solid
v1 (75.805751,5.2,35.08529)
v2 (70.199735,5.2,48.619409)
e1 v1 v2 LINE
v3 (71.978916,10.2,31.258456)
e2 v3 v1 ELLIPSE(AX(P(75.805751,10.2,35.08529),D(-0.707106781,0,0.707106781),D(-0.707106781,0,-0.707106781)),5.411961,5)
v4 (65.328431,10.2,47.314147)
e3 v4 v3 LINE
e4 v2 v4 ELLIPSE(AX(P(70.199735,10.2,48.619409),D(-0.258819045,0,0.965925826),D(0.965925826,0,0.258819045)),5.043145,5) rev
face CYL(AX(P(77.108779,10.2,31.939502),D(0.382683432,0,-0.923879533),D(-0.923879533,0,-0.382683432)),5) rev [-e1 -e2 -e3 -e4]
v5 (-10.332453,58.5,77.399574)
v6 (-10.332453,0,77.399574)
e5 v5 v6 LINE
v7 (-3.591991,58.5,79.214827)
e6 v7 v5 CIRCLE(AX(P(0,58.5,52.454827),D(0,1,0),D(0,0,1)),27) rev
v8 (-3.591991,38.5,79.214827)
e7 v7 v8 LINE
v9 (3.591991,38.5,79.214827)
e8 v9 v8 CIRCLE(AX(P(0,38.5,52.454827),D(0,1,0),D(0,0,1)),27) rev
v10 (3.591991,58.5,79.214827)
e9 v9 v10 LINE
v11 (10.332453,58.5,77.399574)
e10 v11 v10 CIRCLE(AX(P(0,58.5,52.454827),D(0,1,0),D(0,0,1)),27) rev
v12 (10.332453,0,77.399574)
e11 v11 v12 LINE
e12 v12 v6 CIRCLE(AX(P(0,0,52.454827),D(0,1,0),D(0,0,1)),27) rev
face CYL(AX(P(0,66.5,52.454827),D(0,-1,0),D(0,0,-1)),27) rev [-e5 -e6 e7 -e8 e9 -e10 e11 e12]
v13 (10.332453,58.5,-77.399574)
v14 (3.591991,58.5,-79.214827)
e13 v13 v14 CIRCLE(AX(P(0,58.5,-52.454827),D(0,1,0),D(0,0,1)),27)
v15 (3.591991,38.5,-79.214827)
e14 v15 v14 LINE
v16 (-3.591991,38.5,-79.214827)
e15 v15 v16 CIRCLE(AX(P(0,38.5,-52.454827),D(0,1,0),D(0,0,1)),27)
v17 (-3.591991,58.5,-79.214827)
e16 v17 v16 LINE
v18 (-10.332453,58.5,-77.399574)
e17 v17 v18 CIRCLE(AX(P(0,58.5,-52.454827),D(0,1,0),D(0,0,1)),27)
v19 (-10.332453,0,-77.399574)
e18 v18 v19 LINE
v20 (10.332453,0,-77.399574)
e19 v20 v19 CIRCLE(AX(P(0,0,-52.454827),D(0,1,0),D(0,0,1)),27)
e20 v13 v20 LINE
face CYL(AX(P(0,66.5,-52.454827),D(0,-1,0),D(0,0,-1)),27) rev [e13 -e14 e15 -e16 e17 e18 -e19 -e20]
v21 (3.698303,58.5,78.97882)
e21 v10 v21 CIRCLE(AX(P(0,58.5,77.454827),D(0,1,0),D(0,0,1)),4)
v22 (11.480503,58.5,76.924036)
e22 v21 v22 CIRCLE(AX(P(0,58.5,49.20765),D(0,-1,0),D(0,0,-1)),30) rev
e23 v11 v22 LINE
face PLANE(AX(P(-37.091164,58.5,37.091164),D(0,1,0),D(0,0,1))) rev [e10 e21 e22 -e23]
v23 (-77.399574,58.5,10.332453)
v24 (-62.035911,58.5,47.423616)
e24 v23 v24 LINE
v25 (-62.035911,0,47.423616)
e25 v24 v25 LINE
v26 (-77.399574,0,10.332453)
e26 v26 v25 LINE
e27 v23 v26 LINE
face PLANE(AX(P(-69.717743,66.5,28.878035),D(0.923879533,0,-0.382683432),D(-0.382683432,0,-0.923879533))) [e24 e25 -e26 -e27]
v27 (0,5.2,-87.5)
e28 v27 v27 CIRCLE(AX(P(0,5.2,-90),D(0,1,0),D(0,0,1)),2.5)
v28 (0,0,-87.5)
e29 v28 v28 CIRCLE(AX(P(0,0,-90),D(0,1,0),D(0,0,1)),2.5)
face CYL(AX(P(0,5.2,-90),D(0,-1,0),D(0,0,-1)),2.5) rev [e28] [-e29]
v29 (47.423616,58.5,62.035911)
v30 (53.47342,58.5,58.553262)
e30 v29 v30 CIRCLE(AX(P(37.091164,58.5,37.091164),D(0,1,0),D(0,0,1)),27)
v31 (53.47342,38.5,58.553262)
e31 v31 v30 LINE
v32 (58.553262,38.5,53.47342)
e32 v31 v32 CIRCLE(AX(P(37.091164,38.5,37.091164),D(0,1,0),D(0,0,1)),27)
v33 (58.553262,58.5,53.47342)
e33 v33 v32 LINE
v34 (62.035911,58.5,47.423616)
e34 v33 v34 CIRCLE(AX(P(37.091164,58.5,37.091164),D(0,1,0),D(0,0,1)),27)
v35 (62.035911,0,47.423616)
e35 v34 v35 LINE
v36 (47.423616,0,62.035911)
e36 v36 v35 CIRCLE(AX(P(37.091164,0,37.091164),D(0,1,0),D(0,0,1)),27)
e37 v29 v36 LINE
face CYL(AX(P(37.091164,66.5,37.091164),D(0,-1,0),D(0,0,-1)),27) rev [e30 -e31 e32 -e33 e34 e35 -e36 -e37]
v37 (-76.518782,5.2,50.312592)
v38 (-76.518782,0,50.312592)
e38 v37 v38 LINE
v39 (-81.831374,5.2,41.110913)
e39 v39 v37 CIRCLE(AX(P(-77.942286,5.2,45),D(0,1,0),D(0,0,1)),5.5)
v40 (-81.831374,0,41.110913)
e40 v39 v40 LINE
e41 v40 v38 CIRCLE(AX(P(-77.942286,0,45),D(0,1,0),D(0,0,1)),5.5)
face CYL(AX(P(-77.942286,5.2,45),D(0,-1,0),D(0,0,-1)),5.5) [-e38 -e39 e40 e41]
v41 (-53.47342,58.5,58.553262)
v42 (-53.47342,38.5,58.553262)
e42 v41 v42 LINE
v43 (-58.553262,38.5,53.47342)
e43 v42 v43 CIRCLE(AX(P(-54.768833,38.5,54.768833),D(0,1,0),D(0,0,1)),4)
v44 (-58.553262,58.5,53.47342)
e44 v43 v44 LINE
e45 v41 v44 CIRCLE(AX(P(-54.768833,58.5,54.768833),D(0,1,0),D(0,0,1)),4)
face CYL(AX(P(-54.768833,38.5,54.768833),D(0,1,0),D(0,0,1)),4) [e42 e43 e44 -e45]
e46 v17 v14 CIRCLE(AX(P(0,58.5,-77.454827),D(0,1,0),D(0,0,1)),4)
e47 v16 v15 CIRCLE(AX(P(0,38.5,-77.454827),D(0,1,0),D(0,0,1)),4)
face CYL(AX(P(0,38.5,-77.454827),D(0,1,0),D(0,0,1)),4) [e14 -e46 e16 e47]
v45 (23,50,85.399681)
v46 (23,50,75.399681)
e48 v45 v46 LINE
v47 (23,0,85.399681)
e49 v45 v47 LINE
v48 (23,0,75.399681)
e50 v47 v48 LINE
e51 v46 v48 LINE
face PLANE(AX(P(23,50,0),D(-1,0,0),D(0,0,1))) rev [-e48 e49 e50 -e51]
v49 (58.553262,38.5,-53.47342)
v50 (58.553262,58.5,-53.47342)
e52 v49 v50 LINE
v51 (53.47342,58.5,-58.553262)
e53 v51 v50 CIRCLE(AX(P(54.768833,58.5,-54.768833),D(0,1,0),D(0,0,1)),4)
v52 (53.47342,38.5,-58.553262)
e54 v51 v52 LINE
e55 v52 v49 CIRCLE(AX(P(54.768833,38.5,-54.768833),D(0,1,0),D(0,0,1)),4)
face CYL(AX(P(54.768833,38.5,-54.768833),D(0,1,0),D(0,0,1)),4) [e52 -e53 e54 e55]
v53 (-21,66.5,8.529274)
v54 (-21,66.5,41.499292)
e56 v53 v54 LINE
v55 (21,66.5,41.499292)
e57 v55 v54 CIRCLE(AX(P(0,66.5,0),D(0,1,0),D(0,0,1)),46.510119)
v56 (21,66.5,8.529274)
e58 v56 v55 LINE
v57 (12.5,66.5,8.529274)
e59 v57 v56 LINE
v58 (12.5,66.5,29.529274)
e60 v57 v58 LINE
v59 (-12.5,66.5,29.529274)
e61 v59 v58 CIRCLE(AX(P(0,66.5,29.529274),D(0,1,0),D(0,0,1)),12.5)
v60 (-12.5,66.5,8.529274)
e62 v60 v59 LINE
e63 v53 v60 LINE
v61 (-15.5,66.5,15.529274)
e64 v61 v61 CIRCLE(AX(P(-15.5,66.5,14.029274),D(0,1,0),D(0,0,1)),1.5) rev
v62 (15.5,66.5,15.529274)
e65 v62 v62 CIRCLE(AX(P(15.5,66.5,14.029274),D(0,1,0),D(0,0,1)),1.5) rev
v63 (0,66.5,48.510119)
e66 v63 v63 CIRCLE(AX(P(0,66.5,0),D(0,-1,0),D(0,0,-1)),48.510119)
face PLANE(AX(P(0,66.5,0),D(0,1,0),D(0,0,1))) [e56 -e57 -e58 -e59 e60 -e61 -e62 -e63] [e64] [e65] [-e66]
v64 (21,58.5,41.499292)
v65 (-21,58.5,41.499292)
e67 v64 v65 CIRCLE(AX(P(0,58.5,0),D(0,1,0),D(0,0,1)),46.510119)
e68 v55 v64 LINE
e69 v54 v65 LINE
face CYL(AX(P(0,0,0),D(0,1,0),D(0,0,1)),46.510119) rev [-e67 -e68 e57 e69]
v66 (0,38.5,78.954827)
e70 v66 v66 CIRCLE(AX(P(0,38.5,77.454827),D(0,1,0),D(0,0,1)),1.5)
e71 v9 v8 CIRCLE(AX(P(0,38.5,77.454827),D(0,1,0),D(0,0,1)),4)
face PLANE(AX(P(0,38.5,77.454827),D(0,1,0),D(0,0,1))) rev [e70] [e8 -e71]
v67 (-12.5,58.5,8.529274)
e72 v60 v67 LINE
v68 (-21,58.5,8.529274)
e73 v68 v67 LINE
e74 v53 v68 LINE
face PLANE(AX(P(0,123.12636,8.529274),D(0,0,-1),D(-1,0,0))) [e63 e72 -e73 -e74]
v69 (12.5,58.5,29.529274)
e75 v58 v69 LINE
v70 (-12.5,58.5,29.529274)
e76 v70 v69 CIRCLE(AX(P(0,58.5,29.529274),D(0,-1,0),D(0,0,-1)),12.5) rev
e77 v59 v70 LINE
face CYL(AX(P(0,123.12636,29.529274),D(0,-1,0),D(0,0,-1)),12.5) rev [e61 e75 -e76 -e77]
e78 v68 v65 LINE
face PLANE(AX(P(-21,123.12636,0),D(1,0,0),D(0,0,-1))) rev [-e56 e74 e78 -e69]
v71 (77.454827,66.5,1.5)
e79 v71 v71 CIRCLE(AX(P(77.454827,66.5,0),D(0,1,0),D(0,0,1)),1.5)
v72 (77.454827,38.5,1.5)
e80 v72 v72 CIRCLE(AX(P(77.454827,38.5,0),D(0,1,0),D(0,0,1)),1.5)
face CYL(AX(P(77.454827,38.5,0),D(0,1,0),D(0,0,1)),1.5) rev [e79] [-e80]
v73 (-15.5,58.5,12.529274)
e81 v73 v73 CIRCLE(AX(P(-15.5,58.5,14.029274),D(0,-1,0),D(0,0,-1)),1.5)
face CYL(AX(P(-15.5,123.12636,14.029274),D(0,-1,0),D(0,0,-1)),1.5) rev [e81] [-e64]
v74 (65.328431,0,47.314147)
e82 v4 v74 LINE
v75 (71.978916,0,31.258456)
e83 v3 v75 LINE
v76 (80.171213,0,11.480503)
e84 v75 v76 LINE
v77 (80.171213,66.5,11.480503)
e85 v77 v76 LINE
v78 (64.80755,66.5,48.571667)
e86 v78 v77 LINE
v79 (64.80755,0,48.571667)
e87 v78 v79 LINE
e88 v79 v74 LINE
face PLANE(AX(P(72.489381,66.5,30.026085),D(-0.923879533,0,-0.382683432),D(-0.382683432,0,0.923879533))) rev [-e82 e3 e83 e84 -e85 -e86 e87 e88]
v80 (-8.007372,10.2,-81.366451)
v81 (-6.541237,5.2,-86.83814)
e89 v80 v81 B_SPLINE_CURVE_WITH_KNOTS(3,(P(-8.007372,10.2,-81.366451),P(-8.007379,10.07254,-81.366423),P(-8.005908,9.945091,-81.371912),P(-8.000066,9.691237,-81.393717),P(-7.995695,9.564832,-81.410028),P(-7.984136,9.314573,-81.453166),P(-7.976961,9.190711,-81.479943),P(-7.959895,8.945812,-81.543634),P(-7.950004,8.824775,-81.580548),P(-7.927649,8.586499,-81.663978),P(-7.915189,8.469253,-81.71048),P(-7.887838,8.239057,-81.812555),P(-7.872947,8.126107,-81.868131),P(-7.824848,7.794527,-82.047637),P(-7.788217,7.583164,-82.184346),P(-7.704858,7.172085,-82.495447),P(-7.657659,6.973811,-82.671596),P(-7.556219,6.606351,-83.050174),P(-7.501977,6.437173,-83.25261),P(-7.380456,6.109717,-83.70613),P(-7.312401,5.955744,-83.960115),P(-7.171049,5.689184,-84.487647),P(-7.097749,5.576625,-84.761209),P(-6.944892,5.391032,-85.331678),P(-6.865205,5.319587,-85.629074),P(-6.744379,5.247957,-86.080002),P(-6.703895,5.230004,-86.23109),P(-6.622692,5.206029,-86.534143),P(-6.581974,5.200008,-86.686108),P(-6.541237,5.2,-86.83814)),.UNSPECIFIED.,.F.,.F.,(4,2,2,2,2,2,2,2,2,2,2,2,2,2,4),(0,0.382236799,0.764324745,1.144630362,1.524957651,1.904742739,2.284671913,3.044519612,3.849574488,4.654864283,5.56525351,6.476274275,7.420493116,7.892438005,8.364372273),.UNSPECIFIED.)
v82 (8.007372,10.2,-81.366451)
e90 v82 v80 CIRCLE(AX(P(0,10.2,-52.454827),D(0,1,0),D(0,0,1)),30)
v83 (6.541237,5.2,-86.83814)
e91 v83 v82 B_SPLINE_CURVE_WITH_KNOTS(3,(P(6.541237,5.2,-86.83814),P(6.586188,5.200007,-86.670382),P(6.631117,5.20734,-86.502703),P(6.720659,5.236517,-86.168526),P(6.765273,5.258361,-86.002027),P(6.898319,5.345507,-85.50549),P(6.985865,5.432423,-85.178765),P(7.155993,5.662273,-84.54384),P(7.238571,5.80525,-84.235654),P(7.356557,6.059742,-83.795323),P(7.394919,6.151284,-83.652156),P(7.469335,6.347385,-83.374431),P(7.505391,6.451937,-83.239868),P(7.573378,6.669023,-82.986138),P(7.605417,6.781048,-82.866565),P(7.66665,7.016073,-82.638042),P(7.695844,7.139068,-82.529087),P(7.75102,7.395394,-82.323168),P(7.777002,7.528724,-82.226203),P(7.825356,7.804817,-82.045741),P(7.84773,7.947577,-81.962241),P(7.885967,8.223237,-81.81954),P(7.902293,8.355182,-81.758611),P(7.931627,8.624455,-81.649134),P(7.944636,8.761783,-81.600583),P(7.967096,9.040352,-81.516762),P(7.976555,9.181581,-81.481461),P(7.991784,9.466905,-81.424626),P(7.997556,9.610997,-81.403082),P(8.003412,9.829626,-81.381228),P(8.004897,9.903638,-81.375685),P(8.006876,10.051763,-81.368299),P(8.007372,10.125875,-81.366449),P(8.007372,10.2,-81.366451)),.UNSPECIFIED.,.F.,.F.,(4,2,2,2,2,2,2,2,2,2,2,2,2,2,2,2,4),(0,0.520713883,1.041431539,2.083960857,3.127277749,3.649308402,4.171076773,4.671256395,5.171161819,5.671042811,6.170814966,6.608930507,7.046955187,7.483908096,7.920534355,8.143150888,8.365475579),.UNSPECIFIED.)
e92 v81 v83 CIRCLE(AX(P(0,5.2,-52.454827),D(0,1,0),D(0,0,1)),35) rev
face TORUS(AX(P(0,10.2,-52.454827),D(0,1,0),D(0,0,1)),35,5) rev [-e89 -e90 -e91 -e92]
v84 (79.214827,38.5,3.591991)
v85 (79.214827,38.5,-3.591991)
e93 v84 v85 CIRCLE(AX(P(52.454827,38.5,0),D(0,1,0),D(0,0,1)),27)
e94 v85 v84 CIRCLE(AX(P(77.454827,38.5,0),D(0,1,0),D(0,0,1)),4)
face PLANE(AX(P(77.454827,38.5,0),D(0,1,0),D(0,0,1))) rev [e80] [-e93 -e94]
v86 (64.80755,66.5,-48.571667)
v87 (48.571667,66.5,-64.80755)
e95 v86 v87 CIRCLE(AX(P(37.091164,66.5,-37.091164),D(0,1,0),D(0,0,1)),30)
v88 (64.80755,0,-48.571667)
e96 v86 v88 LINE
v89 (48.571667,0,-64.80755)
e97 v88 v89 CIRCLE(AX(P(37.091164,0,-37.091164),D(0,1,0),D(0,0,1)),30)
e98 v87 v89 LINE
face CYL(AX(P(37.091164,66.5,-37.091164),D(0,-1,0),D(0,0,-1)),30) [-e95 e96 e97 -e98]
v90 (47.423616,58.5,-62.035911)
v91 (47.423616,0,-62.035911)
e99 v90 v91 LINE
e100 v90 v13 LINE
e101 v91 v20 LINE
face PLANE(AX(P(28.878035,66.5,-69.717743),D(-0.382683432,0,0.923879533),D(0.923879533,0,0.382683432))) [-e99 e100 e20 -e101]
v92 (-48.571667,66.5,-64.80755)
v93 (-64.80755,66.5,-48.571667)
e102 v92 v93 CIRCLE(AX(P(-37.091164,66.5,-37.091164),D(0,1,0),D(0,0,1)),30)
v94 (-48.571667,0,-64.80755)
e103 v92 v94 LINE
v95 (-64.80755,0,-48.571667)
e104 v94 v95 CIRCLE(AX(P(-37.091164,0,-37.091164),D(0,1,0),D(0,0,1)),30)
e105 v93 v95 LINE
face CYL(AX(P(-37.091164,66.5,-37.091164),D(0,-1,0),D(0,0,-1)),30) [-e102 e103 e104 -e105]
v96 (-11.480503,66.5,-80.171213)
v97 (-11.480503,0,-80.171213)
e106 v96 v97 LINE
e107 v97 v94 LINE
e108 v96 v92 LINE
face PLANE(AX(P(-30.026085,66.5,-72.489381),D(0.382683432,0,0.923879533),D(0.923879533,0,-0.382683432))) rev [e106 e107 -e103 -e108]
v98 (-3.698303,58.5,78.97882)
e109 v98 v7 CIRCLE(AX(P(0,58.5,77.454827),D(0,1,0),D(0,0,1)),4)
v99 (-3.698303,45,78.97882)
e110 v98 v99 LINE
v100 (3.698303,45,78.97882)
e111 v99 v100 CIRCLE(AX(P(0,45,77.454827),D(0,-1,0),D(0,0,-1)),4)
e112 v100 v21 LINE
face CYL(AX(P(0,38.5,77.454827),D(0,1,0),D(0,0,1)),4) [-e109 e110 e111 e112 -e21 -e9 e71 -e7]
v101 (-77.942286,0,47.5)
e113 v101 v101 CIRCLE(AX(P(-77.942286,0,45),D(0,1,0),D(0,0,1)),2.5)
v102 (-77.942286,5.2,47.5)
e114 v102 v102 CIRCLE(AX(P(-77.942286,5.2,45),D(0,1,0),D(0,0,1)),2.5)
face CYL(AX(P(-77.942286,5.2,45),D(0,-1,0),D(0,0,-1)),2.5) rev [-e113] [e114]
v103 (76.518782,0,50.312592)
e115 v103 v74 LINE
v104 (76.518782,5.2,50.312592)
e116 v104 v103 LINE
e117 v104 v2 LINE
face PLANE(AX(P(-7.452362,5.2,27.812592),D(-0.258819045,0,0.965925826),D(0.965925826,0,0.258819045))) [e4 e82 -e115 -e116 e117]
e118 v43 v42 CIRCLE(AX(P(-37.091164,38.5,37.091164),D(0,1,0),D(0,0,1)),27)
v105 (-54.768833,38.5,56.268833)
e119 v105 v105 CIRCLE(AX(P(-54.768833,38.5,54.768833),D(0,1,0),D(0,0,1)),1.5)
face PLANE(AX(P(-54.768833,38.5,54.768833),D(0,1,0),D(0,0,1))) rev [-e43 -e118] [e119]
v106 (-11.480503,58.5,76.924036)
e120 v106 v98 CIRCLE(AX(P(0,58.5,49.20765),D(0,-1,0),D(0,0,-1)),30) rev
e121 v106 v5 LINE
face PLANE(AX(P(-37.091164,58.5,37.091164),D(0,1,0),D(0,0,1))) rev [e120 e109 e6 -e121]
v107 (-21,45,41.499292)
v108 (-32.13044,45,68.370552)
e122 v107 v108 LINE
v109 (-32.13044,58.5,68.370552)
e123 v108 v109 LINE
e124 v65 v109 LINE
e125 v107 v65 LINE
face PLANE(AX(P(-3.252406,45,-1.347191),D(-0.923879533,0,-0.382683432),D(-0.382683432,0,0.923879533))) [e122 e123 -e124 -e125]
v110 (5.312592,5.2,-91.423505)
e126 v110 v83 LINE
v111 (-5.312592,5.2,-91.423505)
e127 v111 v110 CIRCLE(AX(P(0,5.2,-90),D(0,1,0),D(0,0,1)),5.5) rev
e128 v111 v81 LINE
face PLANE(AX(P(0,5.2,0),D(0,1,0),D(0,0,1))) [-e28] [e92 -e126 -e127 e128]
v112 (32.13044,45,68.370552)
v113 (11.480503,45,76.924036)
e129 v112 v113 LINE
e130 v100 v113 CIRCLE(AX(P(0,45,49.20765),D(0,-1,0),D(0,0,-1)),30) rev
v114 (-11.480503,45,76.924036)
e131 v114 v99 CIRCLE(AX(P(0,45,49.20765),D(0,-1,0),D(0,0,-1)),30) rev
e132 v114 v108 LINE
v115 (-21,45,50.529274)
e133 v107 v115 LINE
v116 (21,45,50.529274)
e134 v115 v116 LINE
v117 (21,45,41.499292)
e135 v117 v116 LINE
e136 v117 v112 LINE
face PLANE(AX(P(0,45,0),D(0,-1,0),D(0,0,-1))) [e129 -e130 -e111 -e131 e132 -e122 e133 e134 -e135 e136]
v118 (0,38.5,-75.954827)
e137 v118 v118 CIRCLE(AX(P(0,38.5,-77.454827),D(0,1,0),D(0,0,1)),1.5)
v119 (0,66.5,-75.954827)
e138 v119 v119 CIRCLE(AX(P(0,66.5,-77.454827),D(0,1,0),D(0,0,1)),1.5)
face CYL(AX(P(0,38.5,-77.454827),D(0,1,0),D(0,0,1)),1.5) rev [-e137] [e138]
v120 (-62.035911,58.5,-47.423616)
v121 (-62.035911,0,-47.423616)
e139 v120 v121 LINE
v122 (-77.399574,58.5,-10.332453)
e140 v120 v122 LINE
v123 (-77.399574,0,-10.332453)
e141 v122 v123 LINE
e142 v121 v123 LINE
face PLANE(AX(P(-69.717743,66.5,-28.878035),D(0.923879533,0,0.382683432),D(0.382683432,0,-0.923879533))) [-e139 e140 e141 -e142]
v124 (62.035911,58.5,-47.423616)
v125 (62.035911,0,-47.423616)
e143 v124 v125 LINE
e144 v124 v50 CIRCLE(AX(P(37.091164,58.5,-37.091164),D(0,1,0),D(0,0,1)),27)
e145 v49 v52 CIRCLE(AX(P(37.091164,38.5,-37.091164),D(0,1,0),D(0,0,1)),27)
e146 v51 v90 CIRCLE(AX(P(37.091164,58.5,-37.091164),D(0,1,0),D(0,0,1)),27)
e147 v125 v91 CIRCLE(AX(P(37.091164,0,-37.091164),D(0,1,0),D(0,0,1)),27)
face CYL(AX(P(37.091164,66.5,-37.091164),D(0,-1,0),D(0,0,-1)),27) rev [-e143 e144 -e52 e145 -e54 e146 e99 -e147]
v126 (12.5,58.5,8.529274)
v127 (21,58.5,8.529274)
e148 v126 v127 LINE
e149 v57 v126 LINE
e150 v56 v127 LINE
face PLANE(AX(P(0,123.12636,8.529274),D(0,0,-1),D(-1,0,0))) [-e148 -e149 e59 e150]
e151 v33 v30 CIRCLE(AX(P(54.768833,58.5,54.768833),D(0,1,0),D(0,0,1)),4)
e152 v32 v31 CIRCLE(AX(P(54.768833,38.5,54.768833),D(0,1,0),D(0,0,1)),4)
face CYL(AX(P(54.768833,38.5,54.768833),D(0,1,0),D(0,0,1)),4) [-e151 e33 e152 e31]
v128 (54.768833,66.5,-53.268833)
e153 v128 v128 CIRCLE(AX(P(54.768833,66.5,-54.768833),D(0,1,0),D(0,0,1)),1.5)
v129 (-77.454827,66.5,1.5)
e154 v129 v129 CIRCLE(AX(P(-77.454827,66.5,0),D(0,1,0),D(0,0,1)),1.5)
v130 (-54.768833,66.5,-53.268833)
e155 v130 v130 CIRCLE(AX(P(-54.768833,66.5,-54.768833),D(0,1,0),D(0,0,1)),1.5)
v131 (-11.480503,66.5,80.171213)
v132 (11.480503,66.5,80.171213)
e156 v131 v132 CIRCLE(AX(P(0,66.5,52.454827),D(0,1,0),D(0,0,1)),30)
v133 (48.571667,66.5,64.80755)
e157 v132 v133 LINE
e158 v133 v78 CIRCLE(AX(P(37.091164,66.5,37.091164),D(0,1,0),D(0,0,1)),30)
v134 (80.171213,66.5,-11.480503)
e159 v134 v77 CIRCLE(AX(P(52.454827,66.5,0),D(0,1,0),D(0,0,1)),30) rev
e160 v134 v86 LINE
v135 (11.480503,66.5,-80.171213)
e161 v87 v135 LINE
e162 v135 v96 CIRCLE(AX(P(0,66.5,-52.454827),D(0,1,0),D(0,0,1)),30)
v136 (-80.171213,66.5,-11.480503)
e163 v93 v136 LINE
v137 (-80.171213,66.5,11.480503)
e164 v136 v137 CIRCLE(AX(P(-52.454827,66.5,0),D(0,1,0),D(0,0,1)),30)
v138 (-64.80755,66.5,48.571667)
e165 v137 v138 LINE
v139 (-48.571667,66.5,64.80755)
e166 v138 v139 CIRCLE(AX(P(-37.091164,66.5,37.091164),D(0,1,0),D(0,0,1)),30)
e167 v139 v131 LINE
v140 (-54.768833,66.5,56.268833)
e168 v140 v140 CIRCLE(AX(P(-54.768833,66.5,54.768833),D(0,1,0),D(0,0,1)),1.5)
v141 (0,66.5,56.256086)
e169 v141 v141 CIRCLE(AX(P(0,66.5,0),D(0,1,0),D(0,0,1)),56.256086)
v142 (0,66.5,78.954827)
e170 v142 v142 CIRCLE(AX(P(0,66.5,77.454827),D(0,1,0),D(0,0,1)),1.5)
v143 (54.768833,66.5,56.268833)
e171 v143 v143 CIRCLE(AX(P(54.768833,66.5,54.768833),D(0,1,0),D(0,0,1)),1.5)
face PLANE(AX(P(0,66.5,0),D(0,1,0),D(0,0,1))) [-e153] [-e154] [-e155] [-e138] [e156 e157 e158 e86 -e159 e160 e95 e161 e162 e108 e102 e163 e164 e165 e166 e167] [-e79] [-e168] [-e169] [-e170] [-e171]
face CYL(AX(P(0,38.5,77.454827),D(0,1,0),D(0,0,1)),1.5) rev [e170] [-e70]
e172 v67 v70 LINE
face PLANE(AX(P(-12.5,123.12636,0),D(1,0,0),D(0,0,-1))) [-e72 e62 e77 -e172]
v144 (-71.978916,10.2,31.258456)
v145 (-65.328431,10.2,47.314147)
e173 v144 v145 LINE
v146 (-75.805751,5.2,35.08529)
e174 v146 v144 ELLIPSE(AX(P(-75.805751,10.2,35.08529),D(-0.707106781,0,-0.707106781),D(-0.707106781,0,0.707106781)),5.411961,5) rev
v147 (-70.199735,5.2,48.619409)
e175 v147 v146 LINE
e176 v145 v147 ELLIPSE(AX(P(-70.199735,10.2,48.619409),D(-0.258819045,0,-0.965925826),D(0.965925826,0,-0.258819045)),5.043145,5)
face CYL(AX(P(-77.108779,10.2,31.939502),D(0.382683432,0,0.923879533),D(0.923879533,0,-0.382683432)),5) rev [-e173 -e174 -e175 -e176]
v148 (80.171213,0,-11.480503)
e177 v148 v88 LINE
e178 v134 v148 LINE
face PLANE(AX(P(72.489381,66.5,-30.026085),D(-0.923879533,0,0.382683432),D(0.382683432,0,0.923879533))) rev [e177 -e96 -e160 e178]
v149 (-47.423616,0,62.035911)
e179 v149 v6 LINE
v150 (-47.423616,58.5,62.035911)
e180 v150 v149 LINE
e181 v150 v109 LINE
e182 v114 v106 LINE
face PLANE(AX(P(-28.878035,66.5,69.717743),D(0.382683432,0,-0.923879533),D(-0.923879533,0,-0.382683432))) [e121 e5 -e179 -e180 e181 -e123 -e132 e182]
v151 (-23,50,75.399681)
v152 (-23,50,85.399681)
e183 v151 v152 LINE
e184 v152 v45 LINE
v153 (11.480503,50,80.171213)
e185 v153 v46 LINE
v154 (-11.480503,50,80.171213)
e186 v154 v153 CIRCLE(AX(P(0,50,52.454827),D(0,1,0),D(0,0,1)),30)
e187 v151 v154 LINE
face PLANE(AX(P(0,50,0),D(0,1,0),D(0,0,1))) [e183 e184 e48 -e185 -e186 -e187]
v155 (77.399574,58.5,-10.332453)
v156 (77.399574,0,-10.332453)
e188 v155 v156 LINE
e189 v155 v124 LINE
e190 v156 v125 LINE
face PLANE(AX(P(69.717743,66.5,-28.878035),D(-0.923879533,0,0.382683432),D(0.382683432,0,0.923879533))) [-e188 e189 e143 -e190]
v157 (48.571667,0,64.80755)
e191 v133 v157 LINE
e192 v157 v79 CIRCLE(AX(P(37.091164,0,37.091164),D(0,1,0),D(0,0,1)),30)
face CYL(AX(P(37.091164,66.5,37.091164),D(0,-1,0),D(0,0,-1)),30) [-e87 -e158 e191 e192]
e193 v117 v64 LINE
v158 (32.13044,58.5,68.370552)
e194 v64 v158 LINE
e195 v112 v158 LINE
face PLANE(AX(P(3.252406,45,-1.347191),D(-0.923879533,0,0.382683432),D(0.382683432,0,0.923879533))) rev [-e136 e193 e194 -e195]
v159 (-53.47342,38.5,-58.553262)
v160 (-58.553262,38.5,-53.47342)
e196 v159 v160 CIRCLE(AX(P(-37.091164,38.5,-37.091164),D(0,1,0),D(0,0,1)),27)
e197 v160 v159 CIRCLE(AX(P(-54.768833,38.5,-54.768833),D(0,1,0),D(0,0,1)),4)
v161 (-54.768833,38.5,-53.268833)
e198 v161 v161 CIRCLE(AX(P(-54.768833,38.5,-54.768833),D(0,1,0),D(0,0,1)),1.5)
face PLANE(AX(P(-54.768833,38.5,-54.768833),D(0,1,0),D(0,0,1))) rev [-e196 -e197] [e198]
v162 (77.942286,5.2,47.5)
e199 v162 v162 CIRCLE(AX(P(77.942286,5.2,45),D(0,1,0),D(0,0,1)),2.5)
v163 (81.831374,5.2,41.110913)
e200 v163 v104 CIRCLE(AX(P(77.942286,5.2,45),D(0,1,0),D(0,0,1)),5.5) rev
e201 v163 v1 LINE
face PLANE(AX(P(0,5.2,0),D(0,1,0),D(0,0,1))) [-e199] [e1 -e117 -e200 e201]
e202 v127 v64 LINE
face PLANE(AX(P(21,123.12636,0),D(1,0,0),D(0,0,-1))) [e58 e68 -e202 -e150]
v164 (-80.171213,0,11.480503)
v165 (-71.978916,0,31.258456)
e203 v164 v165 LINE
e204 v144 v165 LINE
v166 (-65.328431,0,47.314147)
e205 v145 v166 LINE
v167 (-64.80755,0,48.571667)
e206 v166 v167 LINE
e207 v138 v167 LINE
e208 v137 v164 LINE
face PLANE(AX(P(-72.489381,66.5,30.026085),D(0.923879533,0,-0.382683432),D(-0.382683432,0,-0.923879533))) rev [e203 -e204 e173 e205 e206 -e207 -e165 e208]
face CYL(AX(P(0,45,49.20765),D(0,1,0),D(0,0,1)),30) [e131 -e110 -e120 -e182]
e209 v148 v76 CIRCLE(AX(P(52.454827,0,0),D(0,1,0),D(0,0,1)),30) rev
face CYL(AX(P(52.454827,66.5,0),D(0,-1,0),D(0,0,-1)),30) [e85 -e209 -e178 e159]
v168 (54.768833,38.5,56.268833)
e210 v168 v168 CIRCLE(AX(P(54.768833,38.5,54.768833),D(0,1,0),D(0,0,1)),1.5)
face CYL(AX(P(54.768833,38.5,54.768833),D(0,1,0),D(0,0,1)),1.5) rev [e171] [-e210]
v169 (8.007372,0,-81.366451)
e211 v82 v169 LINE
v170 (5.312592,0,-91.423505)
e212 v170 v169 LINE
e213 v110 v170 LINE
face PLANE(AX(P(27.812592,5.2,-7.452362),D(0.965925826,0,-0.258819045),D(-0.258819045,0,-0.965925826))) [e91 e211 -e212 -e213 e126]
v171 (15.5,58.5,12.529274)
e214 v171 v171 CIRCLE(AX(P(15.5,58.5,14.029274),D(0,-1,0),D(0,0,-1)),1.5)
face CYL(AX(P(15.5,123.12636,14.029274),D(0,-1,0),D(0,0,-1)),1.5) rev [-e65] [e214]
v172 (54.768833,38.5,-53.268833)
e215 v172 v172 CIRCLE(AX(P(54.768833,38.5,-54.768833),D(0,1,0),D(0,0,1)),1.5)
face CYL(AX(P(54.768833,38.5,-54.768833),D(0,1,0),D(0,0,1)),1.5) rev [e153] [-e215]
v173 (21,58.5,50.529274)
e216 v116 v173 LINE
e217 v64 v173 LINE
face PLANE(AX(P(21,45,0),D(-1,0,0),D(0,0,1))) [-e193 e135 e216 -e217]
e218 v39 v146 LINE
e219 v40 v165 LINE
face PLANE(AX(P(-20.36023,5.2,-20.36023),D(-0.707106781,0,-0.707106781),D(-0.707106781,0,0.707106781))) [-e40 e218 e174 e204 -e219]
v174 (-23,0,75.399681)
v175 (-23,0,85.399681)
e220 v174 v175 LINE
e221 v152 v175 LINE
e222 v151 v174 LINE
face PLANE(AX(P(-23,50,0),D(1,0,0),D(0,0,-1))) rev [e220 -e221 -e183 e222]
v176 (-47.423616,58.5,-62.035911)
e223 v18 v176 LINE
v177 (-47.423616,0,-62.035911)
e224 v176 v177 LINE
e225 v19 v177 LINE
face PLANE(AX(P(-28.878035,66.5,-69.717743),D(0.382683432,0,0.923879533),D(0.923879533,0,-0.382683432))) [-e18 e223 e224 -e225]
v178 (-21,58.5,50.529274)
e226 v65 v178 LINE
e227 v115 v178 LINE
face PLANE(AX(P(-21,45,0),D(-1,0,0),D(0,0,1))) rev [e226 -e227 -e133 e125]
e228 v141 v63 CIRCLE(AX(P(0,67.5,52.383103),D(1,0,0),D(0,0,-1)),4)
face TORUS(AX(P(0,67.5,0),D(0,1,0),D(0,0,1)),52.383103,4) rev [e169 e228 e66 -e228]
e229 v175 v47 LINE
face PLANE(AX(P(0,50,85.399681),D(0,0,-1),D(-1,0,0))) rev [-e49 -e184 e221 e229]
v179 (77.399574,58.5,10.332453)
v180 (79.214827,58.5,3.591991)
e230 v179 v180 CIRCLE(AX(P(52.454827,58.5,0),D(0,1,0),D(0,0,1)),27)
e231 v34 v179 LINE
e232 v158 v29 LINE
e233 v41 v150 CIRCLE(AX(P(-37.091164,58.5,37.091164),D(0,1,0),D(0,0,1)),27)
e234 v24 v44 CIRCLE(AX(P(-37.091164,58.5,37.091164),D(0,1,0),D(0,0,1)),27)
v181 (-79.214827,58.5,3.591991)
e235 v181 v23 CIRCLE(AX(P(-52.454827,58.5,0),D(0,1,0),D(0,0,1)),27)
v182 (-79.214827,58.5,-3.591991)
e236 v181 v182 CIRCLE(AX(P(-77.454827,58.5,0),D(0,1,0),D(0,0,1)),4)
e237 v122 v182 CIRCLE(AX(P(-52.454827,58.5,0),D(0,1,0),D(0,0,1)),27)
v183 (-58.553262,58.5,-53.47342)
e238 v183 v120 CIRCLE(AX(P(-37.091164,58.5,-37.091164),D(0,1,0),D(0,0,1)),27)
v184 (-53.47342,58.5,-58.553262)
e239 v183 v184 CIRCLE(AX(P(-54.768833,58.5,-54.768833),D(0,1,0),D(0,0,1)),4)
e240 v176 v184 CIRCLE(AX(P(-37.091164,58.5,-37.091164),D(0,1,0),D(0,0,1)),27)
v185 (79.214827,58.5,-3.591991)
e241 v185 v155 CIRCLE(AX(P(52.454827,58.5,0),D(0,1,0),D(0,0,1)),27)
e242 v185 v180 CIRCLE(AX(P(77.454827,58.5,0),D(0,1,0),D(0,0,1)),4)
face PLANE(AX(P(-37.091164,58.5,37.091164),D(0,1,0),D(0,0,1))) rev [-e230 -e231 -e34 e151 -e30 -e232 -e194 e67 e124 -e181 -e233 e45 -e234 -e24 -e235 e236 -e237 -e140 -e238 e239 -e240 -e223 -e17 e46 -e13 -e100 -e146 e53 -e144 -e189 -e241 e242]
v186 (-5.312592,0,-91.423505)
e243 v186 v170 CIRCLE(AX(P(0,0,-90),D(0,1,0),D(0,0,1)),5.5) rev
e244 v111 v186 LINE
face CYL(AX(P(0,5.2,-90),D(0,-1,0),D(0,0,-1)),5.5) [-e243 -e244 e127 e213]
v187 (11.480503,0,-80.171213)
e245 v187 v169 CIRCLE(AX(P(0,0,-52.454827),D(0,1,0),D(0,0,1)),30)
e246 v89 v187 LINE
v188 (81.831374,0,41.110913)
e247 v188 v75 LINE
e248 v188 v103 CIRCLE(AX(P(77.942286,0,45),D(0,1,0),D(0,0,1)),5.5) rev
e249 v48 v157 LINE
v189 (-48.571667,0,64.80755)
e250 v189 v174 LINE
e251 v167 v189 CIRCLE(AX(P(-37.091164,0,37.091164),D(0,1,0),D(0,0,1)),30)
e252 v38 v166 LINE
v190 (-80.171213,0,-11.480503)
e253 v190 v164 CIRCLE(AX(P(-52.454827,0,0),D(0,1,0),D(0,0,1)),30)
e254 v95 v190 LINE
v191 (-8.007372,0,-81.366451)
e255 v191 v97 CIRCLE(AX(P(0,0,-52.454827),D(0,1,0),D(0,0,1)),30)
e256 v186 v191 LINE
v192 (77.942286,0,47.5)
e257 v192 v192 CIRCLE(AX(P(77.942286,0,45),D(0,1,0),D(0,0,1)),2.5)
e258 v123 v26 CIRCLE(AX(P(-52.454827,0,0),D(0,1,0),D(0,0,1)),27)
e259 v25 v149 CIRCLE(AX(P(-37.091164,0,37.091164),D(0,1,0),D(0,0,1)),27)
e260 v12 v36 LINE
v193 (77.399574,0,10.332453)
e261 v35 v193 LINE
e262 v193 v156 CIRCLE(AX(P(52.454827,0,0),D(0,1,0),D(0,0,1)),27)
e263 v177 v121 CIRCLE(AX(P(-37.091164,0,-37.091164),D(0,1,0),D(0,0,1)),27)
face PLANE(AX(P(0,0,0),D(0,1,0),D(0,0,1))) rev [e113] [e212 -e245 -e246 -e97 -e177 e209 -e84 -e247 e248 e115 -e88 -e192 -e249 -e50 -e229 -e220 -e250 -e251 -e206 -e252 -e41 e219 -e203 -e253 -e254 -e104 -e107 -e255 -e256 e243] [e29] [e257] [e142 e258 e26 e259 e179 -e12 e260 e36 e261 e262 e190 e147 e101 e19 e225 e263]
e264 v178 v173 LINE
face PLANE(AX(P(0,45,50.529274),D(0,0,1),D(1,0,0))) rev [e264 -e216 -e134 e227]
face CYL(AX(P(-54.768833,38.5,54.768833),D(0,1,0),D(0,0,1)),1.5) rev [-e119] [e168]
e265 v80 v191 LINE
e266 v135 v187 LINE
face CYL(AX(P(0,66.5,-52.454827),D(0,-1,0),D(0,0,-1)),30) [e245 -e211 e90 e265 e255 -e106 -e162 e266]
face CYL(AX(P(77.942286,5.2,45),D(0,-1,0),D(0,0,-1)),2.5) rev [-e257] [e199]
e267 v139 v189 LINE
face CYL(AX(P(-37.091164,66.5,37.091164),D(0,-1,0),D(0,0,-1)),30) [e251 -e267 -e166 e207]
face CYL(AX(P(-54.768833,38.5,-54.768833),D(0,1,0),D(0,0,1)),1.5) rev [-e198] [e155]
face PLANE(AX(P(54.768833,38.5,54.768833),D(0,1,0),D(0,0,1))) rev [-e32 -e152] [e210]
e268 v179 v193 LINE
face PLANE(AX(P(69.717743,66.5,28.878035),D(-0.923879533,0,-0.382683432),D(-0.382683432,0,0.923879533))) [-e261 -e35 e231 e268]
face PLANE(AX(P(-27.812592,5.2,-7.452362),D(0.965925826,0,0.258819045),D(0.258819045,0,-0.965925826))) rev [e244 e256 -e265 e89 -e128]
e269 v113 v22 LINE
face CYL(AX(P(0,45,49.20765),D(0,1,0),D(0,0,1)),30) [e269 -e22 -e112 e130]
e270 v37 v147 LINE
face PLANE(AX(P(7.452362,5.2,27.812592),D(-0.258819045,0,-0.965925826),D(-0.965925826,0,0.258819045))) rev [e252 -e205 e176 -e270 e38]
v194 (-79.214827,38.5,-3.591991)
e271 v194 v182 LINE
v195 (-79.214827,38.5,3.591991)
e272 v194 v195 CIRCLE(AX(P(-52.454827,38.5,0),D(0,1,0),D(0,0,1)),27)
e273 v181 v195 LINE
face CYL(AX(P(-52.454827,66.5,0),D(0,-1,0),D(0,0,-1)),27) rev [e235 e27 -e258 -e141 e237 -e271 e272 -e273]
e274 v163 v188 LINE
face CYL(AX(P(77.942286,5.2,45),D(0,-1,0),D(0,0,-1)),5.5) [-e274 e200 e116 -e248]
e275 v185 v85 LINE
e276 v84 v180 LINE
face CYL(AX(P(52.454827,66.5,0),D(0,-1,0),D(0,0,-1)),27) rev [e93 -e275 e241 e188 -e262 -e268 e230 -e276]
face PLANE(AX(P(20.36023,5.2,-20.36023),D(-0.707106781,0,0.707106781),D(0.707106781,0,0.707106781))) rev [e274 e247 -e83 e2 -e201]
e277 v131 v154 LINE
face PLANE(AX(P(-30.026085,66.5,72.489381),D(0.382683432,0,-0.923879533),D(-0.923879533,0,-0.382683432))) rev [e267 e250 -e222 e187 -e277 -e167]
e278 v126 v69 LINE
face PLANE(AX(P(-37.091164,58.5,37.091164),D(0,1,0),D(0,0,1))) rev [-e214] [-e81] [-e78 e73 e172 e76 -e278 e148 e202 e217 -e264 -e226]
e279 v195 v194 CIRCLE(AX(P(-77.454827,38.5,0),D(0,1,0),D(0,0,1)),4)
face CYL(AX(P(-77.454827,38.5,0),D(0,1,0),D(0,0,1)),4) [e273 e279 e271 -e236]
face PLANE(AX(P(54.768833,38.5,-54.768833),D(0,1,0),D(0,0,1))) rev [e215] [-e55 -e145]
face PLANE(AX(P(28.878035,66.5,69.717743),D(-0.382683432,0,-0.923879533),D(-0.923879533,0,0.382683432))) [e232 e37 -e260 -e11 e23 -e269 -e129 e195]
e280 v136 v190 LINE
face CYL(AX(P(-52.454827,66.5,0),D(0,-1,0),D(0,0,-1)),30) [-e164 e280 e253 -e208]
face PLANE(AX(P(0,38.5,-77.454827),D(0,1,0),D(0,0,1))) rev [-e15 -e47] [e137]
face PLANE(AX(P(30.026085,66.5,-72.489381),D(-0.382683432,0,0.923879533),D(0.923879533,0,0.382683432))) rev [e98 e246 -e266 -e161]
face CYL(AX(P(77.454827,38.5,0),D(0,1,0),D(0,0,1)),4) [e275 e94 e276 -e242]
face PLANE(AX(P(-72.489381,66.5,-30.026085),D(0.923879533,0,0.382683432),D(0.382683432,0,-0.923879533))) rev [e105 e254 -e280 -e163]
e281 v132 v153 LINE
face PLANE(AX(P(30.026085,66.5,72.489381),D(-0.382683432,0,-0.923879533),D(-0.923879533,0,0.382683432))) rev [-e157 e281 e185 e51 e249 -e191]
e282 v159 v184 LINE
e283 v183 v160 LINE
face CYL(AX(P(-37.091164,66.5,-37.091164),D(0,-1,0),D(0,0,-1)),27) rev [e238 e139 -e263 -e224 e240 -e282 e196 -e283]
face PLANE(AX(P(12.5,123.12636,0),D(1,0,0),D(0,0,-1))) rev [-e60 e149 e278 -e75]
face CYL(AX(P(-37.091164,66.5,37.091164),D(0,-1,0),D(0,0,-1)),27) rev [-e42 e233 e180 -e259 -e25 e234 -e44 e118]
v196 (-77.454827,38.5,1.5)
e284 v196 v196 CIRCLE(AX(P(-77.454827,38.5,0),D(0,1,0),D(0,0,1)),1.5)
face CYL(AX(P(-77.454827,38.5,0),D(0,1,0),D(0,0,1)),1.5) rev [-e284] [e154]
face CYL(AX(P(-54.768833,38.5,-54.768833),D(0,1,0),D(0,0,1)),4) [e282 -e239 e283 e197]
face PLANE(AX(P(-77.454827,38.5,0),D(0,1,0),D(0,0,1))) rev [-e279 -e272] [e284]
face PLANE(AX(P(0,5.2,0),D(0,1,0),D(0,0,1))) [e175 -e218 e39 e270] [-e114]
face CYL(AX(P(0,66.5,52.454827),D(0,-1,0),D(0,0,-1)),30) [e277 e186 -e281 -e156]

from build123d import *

# Parameters (mm, degrees)
BOSS_EXTRUDE1_DEPTH     = 66.5
BOSS_EXTRUDE2_DEPTH     = 50
SKETCH1_4_R             = 2.5
BOSS_EXTRUDE3_DEPTH     = 5.2
BOSS_EXTRUDE4_START     = -8
BOSS_EXTRUDE4_DEPTH     = 8
FILLET1_R               = 5
SKETCH9_R               = 4
SKETCH5_R               = 46.510119354
CUT_EXTRUDE1_DEPTH      = 144.196072443
BOSS_EXTRUDE5_START     = -8
BOSS_EXTRUDE5_OUTLINE_R = 1.5
BOSS_EXTRUDE5_DEPTH     = 8
BOSS_EXTRUDE6_DEPTH     = 13.5
BOSS_EXTRUDE7_START     = -8
SKETCH7_R               = 4
SKETCH7_R_2             = 1.5
BOSS_EXTRUDE7_DEPTH     = 20
SKETCH7_2_R             = 1.5
CUT_EXTRUDE2_DEPTH      = 144.196072443


# Read off the part's stored shape, not the designer's step: Boss-Extrude5
with BuildPart() as part:
    # Sketch1 → Boss-Extrude1 (new body)
    with BuildSketch(Plane(origin=(0, 0, 0), x_dir=(1, 0, 0), z_dir=(0, 1, 0))):
        with BuildLine():
            Line((-48.571666642, -64.807549647), (-11.480502971, -80.171212684))
            ThreePointArc((-11.480502971, -80.171212684), (0, -82.454826708), (11.480502971, -80.171212684))
            Line((11.480502971, -80.171212684), (48.571666642, -64.807549647))
            ThreePointArc((48.571666642, -64.807549647), (58.304367107, -58.304367107), (64.807549647, -48.571666642))
            Line((64.807549647, -48.571666642), (80.171212684, -11.480502971))
            ThreePointArc((80.171212684, -11.480502971), (82.454826708, 0), (80.171212684, 11.480502971))
            Line((80.171212684, 11.480502971), (64.807549647, 48.571666642))
            ThreePointArc((64.807549647, 48.571666642), (58.304367107, 58.304367107), (48.571666642, 64.807549647))
            Line((48.571666642, 64.807549647), (11.480502971, 80.171212684))
            ThreePointArc((11.480502971, 80.171212684), (0, 82.454826708), (-11.480502971, 80.171212684))
            Line((-11.480502971, 80.171212684), (-48.571666642, 64.807549647))
            ThreePointArc((-48.571666642, 64.807549647), (-58.304367107, 58.304367107), (-64.807549647, 48.571666642))
            Line((-64.807549647, 48.571666642), (-80.171212684, 11.480502971))
            ThreePointArc((-80.171212684, 11.480502971), (-82.454826708, 0), (-80.171212684, -11.480502971))
            Line((-80.171212684, -11.480502971), (-64.807549647, -48.571666642))
            ThreePointArc((-64.807549647, -48.571666642), (-58.304367107, -58.304367107), (-48.571666642, -64.807549647))
        make_face()
        with BuildLine():
            ThreePointArc((-62.035911049, -47.423616345), (-56.183046763, -56.183046763), (-47.423616345, -62.035911049))
            Line((-47.423616345, -62.035911049), (-10.332452674, -77.399574086))
            ThreePointArc((-10.332452674, -77.399574086), (0, -79.454826708), (10.332452674, -77.399574086))
            Line((10.332452674, -77.399574086), (47.423616345, -62.035911049))
            ThreePointArc((47.423616345, -62.035911049), (56.183046763, -56.183046763), (62.035911049, -47.423616345))
            Line((62.035911049, -47.423616345), (77.399574086, -10.332452674))
            ThreePointArc((77.399574086, -10.332452674), (79.454826708, 0), (77.399574086, 10.332452674))
            Line((77.399574086, 10.332452674), (62.035911049, 47.423616345))
            ThreePointArc((62.035911049, 47.423616345), (56.183046763, 56.183046763), (47.423616345, 62.035911049))
            Line((47.423616345, 62.035911049), (10.332452674, 77.399574086))
            ThreePointArc((10.332452674, 77.399574086), (0, 79.454826708), (-10.332452674, 77.399574086))
            Line((-10.332452674, 77.399574086), (-47.423616345, 62.035911049))
            ThreePointArc((-47.423616345, 62.035911049), (-56.183046763, 56.183046763), (-62.035911049, 47.423616345))
            Line((-62.035911049, 47.423616345), (-77.399574086, 10.332452674))
            ThreePointArc((-77.399574086, 10.332452674), (-79.454826708, 0), (-77.399574086, -10.332452674))
            Line((-77.399574086, -10.332452674), (-62.035911049, -47.423616345))
        make_face(mode=Mode.SUBTRACT)
    extrude(amount=BOSS_EXTRUDE1_DEPTH)

    # Sketch1<3> → Boss-Extrude2 (add)
    with BuildSketch(Plane(origin=(0, 0, 0), x_dir=(1, 0, 0), z_dir=(0, 1, 0))):
        with BuildLine():
            Line((23, -85.399680782), (23, -75.399680782))
            Line((23, -75.399680782), (11.480502971, -80.171212684))
            ThreePointArc((11.480502971, -80.171212684), (0, -82.454826708), (-11.480502971, -80.171212684))
            Line((-11.480502971, -80.171212684), (-23, -75.399680782))
            Line((-23, -75.399680782), (-23, -85.399680782))
            Line((-23, -85.399680782), (23, -85.399680782))
        make_face()
    extrude(amount=BOSS_EXTRUDE2_DEPTH)

    # Sketch1<4> → Boss-Extrude3 (add)
    # profile 1 of 3: a face of its own
    with BuildSketch(Plane(origin=(0, 0, 0), x_dir=(1, 0, 0), z_dir=(0, 1, 0))):
        with BuildLine():
            Line((-65.328431438, -47.314146758), (-71.978916488, -31.258455554))
            Line((-71.978916488, -31.258455554), (-81.831373637, -41.110912703))
            ThreePointArc((-81.831373637, -41.110912703), (-82.705426061, -47.75), (-76.518781593, -50.312592045))
            Line((-76.518781593, -50.312592045), (-65.328431438, -47.314146758))
        make_face()
        with Locations(Location((-77.942286341, -45, 0), (0, 0, 270))):
            Circle(SKETCH1_4_R, mode=Mode.SUBTRACT)
    # profile 2 of 3: a face of its own
    with BuildSketch(Plane(origin=(0, 0, 0), x_dir=(1, 0, 0), z_dir=(0, 1, 0))):
        with BuildLine():
            Line((81.831373637, -41.110912703), (71.978916488, -31.258455554))
            Line((71.978916488, -31.258455554), (65.328431438, -47.314146758))
            Line((65.328431438, -47.314146758), (76.518781593, -50.312592045))
            ThreePointArc((76.518781593, -50.312592045), (82.705426061, -47.75), (81.831373637, -41.110912703))
        make_face()
        with Locations(Location((77.942286341, -45, 0), (0, 0, 270))):
            Circle(SKETCH1_4_R, mode=Mode.SUBTRACT)
    # profile 3 of 3: a face of its own
    with BuildSketch(Plane(origin=(0, 0, 0), x_dir=(1, 0, 0), z_dir=(0, 1, 0))):
        with BuildLine():
            ThreePointArc((-8.00737156, 81.36645068), (0, 82.454826708), (8.00737156, 81.36645068))
            Line((8.00737156, 81.36645068), (5.312592045, 91.423504748))
            ThreePointArc((5.312592045, 91.423504748), (0, 95.5), (-5.312592045, 91.423504748))
            Line((-5.312592045, 91.423504748), (-8.00737156, 81.36645068))
        make_face()
        with Locations(Location((0, 90, 0), (0, 0, 270))):
            Circle(SKETCH1_4_R, mode=Mode.SUBTRACT)
    extrude(amount=BOSS_EXTRUDE3_DEPTH)

    # Sketch2 → Boss-Extrude4 (add)
    with BuildSketch(Plane(origin=(0, 66.5, 0), x_dir=(1, 0, 0), z_dir=(0, 1, 0)).offset(BOSS_EXTRUDE4_START)):
        with BuildLine():
            Line((-80.171212684, -11.480502971), (-64.807549647, -48.571666642))
            ThreePointArc((-64.807549647, -48.571666642), (-58.304367107, -58.304367107), (-48.571666642, -64.807549647))
            Line((-48.571666642, -64.807549647), (-11.480502971, -80.171212684))
            ThreePointArc((-11.480502971, -80.171212684), (0, -82.454826708), (11.480502971, -80.171212684))
            Line((11.480502971, -80.171212684), (48.571666642, -64.807549647))
            ThreePointArc((48.571666642, -64.807549647), (58.304367107, -58.304367107), (64.807549647, -48.571666642))
            Line((64.807549647, -48.571666642), (80.171212684, -11.480502971))
            ThreePointArc((80.171212684, -11.480502971), (82.454826708, 0), (80.171212684, 11.480502971))
            Line((80.171212684, 11.480502971), (64.807549647, 48.571666642))
            ThreePointArc((64.807549647, 48.571666642), (58.304367107, 58.304367107), (48.571666642, 64.807549647))
            Line((48.571666642, 64.807549647), (11.480502971, 80.171212684))
            ThreePointArc((11.480502971, 80.171212684), (0, 82.454826708), (-11.480502971, 80.171212684))
            Line((-11.480502971, 80.171212684), (-48.571666642, 64.807549647))
            ThreePointArc((-48.571666642, 64.807549647), (-58.304367107, 58.304367107), (-64.807549647, 48.571666642))
            Line((-64.807549647, 48.571666642), (-80.171212684, 11.480502971))
            ThreePointArc((-80.171212684, 11.480502971), (-82.454826708, 0), (-80.171212684, -11.480502971))
        make_face()
    extrude(amount=BOSS_EXTRUDE4_DEPTH)

    # Fillet1
    fillet1_edges = [part.edges().sort_by_distance(p)[0] for p in [
        (-68.653673963, 5.2, 39.286301156),
        (68.653673963, 5.2, 39.286301156),
        (0, 5.2, -82.454826708),
    ]]
    fillet(fillet1_edges, radius=FILLET1_R)

    # Cut-Sweep2: sweep along a path in Sketch3
    with BuildLine(Plane(origin=(0, 66.5, 0), x_dir=(1, 0, 0), z_dir=(0, 1, 0))) as cut_sweep2_path:
        CenterArc((0, 0), 52.3831027, 0, 360)
    # Sketch9 → Cut-Sweep2 (sweep, cut)
    with BuildSketch(Plane(origin=(0, 0, 0), x_dir=(0, 0, -1), z_dir=(1, 0, 0))):
        with Locations((-52.3831027, 67.5)):
            Circle(SKETCH9_R)
    sweep(path=cut_sweep2_path.line, mode=Mode.SUBTRACT)

    # Sketch5 → Cut-Extrude1 (cut, through all)
    with BuildSketch(Plane(origin=(0, 66.5, 0), x_dir=(1, 0, 0), z_dir=(0, 1, 0))):
        with Locations(Location((0, 0, 0), (0, 0, 270))):
            Circle(SKETCH5_R)
    extrude(amount=-CUT_EXTRUDE1_DEPTH, mode=Mode.SUBTRACT)

    # Boss-Extrude5 outline → Boss-Extrude5 (add)
    with BuildSketch(Plane.XZ.offset(-58.5).offset(BOSS_EXTRUDE5_START)):
        with BuildLine():
            ThreePointArc((-12.5, 29.529273706), (0, 42.029273706), (12.5, 29.529273706))
            Line((12.5, 29.529273706), (12.5, 8.529273706))
            Line((12.5, 8.529273706), (21, 8.529273706))
            Line((21, 8.529273706), (21, 41.499291588))
            ThreePointArc((21, 41.499291588), (0, 46.510119354), (-21, 41.499291588))
            Line((-21, 41.499291588), (-21, 8.529273706))
            Line((-21, 8.529273706), (-12.5, 8.529273706))
            Line((-12.5, 8.529273706), (-12.5, 29.529273706))
        make_face()
        with Locations((-15.5, 14.029273706)):
            Circle(BOSS_EXTRUDE5_OUTLINE_R, mode=Mode.SUBTRACT)
        with Locations((15.5, 14.029273706)):
            Circle(BOSS_EXTRUDE5_OUTLINE_R, mode=Mode.SUBTRACT)
    extrude(amount=BOSS_EXTRUDE5_DEPTH)

    # Sketch6 → Boss-Extrude6 (add)
    with BuildSketch(Plane.XZ.offset(-58.5)):
        with BuildLine():
            Line((21, 50.529273706), (21, 41.499291588))
            Line((21, 41.499291588), (32.130440464, 68.370551911))
            Line((32.130440464, 68.370551911), (11.480502971, 76.924036083))
            ThreePointArc((11.480502971, 76.924036083), (0, 79.207650107), (-11.480502971, 76.924036083))
            Line((-11.480502971, 76.924036083), (-32.130440464, 68.370551911))
            Line((-32.130440464, 68.370551911), (-21, 41.499291588))
            Line((-21, 41.499291588), (-21, 50.529273706))
            Line((-21, 50.529273706), (21, 50.529273706))
        make_face()
    extrude(amount=BOSS_EXTRUDE6_DEPTH)

    # Sketch7 → Boss-Extrude7 (add)
    # profile 1 of 8: a face of its own
    with BuildSketch(Plane(origin=(0, 66.5, 0), x_dir=(1, 0, 0), z_dir=(0, 1, 0)).offset(BOSS_EXTRUDE7_START)):
        with Locations((-54.768833201, 54.768833201)):
            Circle(SKETCH7_R)
        with Locations(Location((-54.768833201, 54.768833201, 0), (0, 0, 270))):
            Circle(SKETCH7_R_2, mode=Mode.SUBTRACT)
    # profile 2 of 8: a face of its own
    with BuildSketch(Plane(origin=(0, 66.5, 0), x_dir=(1, 0, 0), z_dir=(0, 1, 0)).offset(BOSS_EXTRUDE7_START)):
        with Locations((0, 77.454826708)):
            Circle(SKETCH7_R)
        with Locations(Location((0, 77.454826708, 0), (0, 0, 270))):
            Circle(SKETCH7_R_2, mode=Mode.SUBTRACT)
    # profile 3 of 8: a face of its own
    with BuildSketch(Plane(origin=(0, 66.5, 0), x_dir=(1, 0, 0), z_dir=(0, 1, 0)).offset(BOSS_EXTRUDE7_START)):
        with Locations((54.768833201, 54.768833201)):
            Circle(SKETCH7_R)
        with Locations(Location((54.768833201, 54.768833201, 0), (0, 0, 270))):
            Circle(SKETCH7_R_2, mode=Mode.SUBTRACT)
    # profile 4 of 8: a face of its own
    with BuildSketch(Plane(origin=(0, 66.5, 0), x_dir=(1, 0, 0), z_dir=(0, 1, 0)).offset(BOSS_EXTRUDE7_START)):
        with Locations((77.454826708, 0)):
            Circle(SKETCH7_R)
        with Locations(Location((77.454826708, 0, 0), (0, 0, 270))):
            Circle(SKETCH7_R_2, mode=Mode.SUBTRACT)
    # profile 5 of 8: a face of its own
    with BuildSketch(Plane(origin=(0, 66.5, 0), x_dir=(1, 0, 0), z_dir=(0, 1, 0)).offset(BOSS_EXTRUDE7_START)):
        with Locations((54.768833201, -54.768833201)):
            Circle(SKETCH7_R)
        with Locations(Location((54.768833201, -54.768833201, 0), (0, 0, 270))):
            Circle(SKETCH7_R_2, mode=Mode.SUBTRACT)
    # profile 6 of 8: a face of its own
    with BuildSketch(Plane(origin=(0, 66.5, 0), x_dir=(1, 0, 0), z_dir=(0, 1, 0)).offset(BOSS_EXTRUDE7_START)):
        with Locations((0, -77.454826708)):
            Circle(SKETCH7_R)
        with Locations(Location((0, -77.454826708, 0), (0, 0, 270))):
            Circle(SKETCH7_R_2, mode=Mode.SUBTRACT)
    # profile 7 of 8: a face of its own
    with BuildSketch(Plane(origin=(0, 66.5, 0), x_dir=(1, 0, 0), z_dir=(0, 1, 0)).offset(BOSS_EXTRUDE7_START)):
        with Locations((-54.768833201, -54.768833201)):
            Circle(SKETCH7_R)
        with Locations(Location((-54.768833201, -54.768833201, 0), (0, 0, 270))):
            Circle(SKETCH7_R_2, mode=Mode.SUBTRACT)
    # profile 8 of 8: a face of its own
    with BuildSketch(Plane(origin=(0, 66.5, 0), x_dir=(1, 0, 0), z_dir=(0, 1, 0)).offset(BOSS_EXTRUDE7_START)):
        with Locations((-77.454826708, 0)):
            Circle(SKETCH7_R)
        with Locations(Location((-77.454826708, 0, 0), (0, 0, 270))):
            Circle(SKETCH7_R_2, mode=Mode.SUBTRACT)
    extrude(amount=-BOSS_EXTRUDE7_DEPTH)

    # Sketch7<2> → Cut-Extrude2 (cut, through all)
    with BuildSketch(Plane(origin=(0, 66.5, 0), x_dir=(1, 0, 0), z_dir=(0, 1, 0))):
        with Locations(Location((-54.768833201, -54.768833201, 0), (0, 0, 270))):
            Circle(SKETCH7_2_R)
        with Locations(Location((-77.454826708, 0, 0), (0, 0, 270))):
            Circle(SKETCH7_2_R)
        with Locations(Location((-54.768833201, 54.768833201, 0), (0, 0, 270))):
            Circle(SKETCH7_2_R)
        with Locations(Location((0, 77.454826708, 0), (0, 0, 270))):
            Circle(SKETCH7_2_R)
        with Locations(Location((54.768833201, 54.768833201, 0), (0, 0, 270))):
            Circle(SKETCH7_2_R)
        with Locations(Location((77.454826708, 0, 0), (0, 0, 270))):
            Circle(SKETCH7_2_R)
        with Locations(Location((54.768833201, -54.768833201, 0), (0, 0, 270))):
            Circle(SKETCH7_2_R)
        with Locations(Location((0, -77.454826708, 0), (0, 0, 270))):
            Circle(SKETCH7_2_R)
    extrude(amount=-CUT_EXTRUDE2_DEPTH, mode=Mode.SUBTRACT)


solid = part.part
